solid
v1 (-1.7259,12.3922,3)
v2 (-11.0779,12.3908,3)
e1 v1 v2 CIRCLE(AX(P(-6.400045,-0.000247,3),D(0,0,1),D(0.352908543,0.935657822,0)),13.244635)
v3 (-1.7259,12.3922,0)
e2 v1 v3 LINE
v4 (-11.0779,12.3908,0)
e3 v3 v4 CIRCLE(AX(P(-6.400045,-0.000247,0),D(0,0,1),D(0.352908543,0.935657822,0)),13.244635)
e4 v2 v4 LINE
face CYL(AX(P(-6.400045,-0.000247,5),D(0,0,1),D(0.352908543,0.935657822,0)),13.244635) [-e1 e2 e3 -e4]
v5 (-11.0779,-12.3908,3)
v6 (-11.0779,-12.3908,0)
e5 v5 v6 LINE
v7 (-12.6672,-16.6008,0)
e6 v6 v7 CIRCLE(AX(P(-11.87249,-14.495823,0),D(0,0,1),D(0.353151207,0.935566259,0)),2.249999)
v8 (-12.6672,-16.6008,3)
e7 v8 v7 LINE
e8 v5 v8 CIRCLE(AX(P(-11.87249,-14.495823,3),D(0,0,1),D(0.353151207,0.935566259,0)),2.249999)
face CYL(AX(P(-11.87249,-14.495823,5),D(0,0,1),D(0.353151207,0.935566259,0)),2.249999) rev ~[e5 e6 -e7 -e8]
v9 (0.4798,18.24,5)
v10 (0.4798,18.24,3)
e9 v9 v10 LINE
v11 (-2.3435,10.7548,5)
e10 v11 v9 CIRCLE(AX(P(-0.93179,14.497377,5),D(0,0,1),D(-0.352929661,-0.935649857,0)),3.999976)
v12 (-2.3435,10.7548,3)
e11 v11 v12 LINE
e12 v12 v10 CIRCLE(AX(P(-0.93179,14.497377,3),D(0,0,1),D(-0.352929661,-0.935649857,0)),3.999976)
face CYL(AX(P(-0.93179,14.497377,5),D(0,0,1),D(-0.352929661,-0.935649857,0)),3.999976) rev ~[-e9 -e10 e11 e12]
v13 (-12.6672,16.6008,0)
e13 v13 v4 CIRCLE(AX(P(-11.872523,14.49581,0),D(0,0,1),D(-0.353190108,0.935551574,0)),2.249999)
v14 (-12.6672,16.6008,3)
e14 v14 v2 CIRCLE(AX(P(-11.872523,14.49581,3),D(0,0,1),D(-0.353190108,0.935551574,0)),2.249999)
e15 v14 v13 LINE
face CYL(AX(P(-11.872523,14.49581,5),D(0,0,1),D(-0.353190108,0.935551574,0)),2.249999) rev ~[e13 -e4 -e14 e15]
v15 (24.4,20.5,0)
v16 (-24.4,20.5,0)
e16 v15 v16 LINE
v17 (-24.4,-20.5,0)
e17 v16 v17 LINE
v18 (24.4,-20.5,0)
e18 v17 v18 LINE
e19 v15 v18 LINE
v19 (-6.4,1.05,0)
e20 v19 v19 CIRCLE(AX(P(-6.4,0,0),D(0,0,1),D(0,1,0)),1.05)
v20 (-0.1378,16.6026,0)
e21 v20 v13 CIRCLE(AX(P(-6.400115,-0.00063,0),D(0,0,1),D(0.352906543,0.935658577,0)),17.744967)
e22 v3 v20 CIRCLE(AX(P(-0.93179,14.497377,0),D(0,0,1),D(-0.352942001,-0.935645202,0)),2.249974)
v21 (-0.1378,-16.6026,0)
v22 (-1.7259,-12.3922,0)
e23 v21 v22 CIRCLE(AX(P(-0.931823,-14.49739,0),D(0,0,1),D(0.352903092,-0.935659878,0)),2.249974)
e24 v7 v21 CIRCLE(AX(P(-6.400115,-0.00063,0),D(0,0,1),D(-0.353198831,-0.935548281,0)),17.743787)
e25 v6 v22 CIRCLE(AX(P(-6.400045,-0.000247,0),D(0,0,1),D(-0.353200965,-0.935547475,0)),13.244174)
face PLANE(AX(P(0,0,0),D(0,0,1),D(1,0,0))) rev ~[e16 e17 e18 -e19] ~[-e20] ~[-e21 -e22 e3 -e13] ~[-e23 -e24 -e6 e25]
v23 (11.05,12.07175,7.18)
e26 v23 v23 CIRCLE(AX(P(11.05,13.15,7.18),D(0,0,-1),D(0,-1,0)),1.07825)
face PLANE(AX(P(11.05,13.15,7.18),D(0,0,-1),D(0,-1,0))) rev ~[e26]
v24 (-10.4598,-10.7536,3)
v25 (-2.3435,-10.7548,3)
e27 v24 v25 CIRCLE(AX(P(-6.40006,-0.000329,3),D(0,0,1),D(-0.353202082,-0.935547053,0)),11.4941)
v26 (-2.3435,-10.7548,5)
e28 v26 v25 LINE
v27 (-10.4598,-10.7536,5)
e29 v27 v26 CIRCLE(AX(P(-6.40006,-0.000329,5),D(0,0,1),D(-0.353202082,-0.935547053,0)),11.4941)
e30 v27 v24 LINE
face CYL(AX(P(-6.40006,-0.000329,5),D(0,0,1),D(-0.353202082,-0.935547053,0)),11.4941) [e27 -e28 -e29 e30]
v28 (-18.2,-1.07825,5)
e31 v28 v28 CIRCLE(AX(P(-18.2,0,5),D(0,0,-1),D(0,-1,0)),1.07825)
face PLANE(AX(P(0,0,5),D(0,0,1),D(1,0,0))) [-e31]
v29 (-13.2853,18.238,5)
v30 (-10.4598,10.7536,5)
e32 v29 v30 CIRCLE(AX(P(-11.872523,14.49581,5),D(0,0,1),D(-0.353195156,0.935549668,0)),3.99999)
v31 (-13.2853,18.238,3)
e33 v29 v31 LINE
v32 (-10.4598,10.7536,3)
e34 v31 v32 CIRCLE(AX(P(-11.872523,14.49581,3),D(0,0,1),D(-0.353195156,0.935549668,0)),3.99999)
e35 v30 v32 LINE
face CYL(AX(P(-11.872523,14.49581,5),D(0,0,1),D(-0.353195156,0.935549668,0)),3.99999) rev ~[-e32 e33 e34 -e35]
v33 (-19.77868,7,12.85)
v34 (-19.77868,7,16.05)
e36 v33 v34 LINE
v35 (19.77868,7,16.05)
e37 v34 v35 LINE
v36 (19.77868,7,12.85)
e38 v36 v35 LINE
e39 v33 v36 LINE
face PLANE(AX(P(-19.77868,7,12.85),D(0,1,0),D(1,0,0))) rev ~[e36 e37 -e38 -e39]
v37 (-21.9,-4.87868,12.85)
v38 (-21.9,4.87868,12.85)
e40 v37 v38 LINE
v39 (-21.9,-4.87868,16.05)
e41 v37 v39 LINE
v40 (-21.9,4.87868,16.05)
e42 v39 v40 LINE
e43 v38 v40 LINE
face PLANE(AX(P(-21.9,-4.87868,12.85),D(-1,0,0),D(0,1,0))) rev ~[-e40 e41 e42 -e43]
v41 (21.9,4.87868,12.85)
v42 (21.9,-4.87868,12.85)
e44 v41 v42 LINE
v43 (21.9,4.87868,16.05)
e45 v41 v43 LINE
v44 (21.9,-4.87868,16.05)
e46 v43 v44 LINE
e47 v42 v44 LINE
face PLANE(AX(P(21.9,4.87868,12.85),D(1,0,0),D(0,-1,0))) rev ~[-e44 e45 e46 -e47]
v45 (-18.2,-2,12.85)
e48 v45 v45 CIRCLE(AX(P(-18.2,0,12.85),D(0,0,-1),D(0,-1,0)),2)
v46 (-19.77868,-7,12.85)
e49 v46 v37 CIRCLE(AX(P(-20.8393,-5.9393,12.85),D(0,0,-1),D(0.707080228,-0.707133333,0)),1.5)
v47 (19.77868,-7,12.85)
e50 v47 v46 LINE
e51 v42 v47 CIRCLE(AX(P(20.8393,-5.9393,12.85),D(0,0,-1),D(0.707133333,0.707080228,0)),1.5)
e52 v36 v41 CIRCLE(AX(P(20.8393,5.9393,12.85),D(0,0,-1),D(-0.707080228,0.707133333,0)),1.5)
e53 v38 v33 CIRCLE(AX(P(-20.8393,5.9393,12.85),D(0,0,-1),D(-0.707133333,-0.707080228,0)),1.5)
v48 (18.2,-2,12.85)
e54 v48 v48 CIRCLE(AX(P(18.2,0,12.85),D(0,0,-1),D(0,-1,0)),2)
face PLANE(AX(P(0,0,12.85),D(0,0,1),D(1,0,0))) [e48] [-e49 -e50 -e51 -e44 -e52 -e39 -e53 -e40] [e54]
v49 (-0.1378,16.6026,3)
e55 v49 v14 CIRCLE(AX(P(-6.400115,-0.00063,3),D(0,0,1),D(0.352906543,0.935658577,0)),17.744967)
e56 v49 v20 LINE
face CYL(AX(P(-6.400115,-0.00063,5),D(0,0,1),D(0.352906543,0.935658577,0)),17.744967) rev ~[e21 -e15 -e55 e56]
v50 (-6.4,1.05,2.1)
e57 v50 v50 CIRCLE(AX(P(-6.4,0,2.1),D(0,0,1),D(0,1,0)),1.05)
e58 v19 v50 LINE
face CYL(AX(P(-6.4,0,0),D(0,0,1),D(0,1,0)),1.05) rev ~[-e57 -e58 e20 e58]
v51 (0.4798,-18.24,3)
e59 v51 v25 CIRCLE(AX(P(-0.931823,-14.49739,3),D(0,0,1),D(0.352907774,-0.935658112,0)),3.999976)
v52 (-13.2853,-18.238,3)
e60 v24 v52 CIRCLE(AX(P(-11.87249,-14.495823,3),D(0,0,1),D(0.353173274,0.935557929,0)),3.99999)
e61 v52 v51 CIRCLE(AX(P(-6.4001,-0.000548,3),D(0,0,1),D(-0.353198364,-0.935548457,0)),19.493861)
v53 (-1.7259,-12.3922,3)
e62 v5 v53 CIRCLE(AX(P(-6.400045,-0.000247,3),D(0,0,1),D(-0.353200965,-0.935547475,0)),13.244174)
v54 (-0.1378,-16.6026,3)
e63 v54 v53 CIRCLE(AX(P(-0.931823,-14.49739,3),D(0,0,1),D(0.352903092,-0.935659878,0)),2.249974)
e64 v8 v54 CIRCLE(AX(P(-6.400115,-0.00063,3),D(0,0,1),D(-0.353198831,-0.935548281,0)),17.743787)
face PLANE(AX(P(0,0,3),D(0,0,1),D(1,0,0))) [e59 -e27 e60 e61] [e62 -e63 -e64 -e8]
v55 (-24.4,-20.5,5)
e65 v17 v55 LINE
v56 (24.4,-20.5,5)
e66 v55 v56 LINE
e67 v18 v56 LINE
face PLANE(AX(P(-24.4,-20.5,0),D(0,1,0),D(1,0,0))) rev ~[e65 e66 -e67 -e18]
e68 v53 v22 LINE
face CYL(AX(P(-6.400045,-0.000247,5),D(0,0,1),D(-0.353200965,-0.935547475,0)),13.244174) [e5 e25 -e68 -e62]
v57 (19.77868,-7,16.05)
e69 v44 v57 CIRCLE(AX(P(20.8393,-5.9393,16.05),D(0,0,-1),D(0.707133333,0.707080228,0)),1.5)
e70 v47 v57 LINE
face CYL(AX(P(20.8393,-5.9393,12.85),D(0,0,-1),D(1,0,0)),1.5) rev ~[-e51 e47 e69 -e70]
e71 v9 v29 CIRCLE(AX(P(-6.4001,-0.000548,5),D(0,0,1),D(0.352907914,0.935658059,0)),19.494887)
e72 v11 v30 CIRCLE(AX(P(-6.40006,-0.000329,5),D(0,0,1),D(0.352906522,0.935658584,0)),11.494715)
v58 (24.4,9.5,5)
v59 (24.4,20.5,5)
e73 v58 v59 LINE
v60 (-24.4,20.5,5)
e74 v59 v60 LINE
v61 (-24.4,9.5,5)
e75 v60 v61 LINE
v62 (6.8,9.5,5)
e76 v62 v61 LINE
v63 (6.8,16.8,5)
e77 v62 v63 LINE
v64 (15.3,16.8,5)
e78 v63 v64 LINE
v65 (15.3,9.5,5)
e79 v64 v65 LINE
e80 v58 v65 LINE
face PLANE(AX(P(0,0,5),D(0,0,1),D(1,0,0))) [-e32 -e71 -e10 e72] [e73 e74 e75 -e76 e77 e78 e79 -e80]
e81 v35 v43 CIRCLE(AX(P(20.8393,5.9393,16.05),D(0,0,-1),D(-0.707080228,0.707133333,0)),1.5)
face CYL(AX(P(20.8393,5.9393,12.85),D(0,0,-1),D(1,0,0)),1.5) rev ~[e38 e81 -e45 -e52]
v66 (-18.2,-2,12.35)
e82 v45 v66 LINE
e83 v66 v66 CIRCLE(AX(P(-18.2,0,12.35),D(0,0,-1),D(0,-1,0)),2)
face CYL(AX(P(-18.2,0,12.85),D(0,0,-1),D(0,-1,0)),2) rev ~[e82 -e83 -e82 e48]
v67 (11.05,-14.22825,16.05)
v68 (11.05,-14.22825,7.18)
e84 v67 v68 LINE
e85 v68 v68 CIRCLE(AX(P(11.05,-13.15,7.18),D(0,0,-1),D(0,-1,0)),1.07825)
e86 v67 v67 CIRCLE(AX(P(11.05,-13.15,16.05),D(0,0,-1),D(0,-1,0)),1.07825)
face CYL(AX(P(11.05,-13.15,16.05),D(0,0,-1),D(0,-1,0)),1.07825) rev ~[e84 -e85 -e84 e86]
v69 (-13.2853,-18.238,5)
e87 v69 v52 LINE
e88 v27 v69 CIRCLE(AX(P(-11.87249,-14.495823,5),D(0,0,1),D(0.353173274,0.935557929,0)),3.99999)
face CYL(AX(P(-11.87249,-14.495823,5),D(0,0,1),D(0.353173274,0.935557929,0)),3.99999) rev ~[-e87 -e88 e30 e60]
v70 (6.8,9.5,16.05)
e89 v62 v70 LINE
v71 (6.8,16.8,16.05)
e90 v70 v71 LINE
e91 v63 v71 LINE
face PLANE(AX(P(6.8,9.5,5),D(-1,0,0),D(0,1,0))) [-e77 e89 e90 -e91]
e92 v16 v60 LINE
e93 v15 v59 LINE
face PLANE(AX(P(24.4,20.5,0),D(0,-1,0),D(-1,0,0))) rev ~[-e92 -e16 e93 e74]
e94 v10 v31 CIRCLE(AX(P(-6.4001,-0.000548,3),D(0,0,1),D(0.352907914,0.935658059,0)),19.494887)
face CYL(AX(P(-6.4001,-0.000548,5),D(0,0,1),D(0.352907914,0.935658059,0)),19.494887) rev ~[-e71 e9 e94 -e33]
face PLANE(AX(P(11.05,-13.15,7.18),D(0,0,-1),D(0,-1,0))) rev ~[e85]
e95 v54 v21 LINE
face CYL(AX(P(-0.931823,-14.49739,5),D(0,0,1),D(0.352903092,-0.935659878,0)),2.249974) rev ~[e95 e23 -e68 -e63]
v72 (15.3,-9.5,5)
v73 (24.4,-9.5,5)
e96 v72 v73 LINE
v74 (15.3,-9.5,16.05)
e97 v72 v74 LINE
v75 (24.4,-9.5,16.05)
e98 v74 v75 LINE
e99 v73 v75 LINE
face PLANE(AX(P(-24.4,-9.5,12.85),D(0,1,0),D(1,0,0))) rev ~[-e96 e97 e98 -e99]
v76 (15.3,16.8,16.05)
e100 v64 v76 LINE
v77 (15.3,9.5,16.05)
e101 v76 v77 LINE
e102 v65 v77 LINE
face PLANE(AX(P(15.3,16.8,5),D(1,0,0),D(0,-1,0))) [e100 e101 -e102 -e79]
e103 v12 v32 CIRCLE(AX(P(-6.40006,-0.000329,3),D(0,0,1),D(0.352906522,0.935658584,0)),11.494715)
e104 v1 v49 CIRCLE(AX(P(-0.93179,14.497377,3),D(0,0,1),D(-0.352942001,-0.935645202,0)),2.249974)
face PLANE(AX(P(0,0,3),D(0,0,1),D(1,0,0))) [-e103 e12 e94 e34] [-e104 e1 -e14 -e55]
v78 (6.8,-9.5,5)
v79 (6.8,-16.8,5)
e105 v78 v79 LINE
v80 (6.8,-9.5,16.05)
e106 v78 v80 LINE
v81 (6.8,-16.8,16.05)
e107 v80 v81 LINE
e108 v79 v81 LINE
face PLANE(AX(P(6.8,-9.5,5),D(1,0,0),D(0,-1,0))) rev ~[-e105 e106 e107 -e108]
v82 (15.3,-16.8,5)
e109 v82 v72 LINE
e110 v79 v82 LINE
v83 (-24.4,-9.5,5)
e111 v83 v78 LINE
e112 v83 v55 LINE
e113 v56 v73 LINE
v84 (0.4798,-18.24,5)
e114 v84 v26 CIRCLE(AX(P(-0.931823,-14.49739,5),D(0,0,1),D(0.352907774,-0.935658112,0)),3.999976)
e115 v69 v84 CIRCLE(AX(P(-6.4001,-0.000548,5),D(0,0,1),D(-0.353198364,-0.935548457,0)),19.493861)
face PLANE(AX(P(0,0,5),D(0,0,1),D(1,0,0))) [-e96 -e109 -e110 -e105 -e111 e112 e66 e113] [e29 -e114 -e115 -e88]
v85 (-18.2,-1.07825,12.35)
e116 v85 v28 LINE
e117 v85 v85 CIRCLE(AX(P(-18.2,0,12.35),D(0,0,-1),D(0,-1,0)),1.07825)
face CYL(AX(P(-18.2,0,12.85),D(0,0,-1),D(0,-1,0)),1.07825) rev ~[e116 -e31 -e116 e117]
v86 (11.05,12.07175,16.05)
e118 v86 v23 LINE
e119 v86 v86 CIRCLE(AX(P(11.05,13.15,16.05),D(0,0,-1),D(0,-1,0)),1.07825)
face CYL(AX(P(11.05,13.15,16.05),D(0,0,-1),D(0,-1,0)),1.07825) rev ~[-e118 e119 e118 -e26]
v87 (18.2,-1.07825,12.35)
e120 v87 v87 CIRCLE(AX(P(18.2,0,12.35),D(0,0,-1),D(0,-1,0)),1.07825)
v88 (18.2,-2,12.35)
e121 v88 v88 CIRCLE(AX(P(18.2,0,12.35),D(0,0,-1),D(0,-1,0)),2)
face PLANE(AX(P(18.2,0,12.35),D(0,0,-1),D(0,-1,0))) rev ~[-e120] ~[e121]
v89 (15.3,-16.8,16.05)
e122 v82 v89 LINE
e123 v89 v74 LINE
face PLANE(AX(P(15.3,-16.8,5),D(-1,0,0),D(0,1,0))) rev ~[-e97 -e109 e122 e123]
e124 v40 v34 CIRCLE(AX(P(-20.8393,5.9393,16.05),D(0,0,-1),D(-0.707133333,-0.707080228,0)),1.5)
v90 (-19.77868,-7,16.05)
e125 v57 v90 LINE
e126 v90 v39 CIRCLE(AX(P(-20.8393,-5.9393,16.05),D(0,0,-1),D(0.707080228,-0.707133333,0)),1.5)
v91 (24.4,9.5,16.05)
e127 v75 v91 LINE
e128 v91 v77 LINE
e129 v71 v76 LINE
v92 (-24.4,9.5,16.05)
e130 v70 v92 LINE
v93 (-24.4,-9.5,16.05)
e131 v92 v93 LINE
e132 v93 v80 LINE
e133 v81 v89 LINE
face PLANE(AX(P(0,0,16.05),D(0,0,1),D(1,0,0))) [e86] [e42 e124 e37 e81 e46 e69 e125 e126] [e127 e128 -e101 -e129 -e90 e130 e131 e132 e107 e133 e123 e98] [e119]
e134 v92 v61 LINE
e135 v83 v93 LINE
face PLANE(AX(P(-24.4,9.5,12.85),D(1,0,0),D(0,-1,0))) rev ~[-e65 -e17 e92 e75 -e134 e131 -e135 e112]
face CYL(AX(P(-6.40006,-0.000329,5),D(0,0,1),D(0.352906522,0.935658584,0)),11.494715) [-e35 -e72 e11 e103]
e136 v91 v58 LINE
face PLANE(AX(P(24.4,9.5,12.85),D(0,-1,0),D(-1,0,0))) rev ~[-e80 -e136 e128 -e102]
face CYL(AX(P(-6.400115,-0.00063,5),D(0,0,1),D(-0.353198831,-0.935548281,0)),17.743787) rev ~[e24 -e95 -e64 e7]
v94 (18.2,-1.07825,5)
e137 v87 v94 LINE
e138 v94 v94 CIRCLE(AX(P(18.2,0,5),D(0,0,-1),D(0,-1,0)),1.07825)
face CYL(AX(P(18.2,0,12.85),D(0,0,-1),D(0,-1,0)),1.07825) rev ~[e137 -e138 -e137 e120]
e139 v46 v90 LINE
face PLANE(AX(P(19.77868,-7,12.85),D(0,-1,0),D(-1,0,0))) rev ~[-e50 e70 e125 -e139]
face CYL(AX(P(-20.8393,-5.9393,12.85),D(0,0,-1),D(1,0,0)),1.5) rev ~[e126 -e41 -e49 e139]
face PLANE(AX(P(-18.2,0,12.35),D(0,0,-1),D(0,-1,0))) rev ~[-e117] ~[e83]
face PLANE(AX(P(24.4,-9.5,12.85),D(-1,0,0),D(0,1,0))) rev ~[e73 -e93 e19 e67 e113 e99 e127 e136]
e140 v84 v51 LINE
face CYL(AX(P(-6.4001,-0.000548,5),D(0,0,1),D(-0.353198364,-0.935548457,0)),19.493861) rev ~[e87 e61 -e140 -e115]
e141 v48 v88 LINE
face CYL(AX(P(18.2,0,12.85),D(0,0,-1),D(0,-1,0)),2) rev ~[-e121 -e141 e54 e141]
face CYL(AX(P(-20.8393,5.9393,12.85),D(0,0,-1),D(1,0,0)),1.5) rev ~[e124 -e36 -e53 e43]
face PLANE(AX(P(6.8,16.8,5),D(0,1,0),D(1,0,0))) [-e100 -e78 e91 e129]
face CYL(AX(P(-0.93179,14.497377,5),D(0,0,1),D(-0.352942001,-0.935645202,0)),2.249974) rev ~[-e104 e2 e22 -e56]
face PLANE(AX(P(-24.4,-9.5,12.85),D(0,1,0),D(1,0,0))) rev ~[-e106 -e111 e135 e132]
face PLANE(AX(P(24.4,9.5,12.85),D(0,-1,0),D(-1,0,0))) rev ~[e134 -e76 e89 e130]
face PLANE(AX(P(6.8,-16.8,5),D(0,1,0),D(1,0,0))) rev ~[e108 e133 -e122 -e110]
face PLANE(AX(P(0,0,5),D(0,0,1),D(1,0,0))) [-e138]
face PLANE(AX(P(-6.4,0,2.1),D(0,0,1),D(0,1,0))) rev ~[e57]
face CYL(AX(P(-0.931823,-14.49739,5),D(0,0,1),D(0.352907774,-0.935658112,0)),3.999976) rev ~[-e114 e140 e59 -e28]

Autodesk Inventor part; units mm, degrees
ref_plane "YZ Plane" through (0, 0, 0) normal (1, 0, 0) x (0, 1, 0)
ref_plane "XZ Plane" through (0, 0, 0) normal (0, 1, 0) x (-1, 0, 0)
ref_plane "XY Plane" through (0, 0, 0) normal (0, 0, 1) x (1, 0, 0)
sketch "Sketch1" plane through (0, 0, 0) normal (0, 0, 1) x (1, 0, 0)
  line L0 (-24.4, -9.5) -> (24.4, -9.5)
  line L1 (24.4, -9.5) -> (24.4, 9.5)
  line L2 (24.4, 9.5) -> (-24.4, 9.5)
  line L3 (-24.4, 9.5) -> (-24.4, -9.5)
  line L4 (-24.4, -9.5) -> (24.4, 9.5) construction
  line L5 (24.4, -9.5) -> (-24.4, 9.5) construction
  point P0 (0, 0)
  dimension "LENGTH" = 48.8
  dimension "WIDTH" = 19
extrude "Extrusion1" add sketch "Sketch1" along normal blind 12.85
sketch "Sketch2" plane through (0, 0, 12.85) normal (0, 0, 1) x (1, 0, 0)
  point P0 (0, 0)
  point P1 (-18.2, 0)
  point P2 (18.2, 0)
  dimension "d11" = 0
  dimension "d12" = 0
  dimension "d13" = 36.4
  dimension "d14" = 18.2
hole "Hole1" at (-18.2, 0, 12.85) at (18.2, 0, 12.85) direction (0, 0, -1) diameter 2.1565 depth 8.87 thread size "4-40 UNC" class "2B" standard "ANSI Unified Screw Threads"
sketch "Sketch3" plane through (0, 0, 12.85) normal (0, 0, 1) x (1, 0, 0)
  point P0 (0, 0)
  point P1 (0, 0)
  dimension "d22" = 0
  dimension "d23" = 0
hole "Hole2" [suppressed]
sketch "Sketch4" plane through (0, 0, 0) normal (0, 0, -1) x (-1, 0, 0)
  line L0 (5.5, 0) -> (4.5, 0) construction
  line L1 (5.5, 1.05) -> (4.5, 1.05)
  line L2 (4.5, -1.05) -> (5.5, -1.05)
  arc A0 (5.5, -1.05) -> (5.5, 1.05) centre (5.5, 0) ccw
  arc A1 (4.5, 1.05) -> (4.5, -1.05) centre (4.5, 0) ccw
  point P0 (0, 0)
  point P1 (-5, 0)
  point P2 (5, 0)
  dimension "d24" = 1
  dimension "d25" = 0
  dimension "d26" = 0
  dimension "d27" = 10
  dimension "d28" = 5
  dimension "d29" = 1.05
hole "Hole3" [suppressed]
extrude "Extrusion2" [suppressed]
sketch "Sketch5" plane through (0, 0, 0) normal (0, 0, 1) x (1, 0, 0)
  line L0 (-24.4, -20.5) -> (24.4, -20.5)
  line L1 (24.4, -20.5) -> (24.4, 20.5)
  line L2 (24.4, 20.5) -> (-24.4, 20.5)
  line L3 (-24.4, 20.5) -> (-24.4, -20.5)
  line L4 (-24.4, -20.5) -> (24.4, 20.5) construction
  line L5 (24.4, -20.5) -> (-24.4, 20.5) construction
  point P0 (0, 0)
  dimension "d39" = 48.8
  dimension "d40" = 41
extrude "Extrusion3" add sketch "Sketch5" along normal blind 5
sketch "Sketch7" plane through (0, 0, 12.85) normal (0, 0, 1) x (1, 0, 0)
  circle A0 centre (18.2, 0) radius 1.0782 projected
  circle A1 centre (-18.2, 0) radius 1.0782 projected
  point P0 (0, 0)
  dimension "d54" = 0
  dimension "d55" = 0
  dimension "d56" = 0
  dimension "d57" = 0
hole "Hole5" at (18.2, 0, 12.85) at (-18.2, 0, 12.85) direction (0, 0, -1) diameter 4 depth 0.5
sketch "Sketch8" plane through (0, 0, 0) normal (0, 0, -1) x (-1, 0, 0)
  line L0 (0, 5.5) -> (0, 4.5) construction
  line L1 (-1.05, 5.5) -> (-1.05, 4.5)
  line L2 (1.05, 4.5) -> (1.05, 5.5)
  arc A0 (1.05, 5.5) -> (-1.05, 5.5) centre (0, 5.5) ccw
  arc A1 (-1.05, 4.5) -> (1.05, 4.5) centre (0, 4.5) ccw
  point P0 (0, 0)
  point P1 (0, -5)
  point P2 (0, 5)
  dimension "d77" = 1
  dimension "d78" = 1.05
  dimension "d79" = 10
  dimension "d80" = 0
  dimension "d81" = 0
  dimension "d82" = 5
hole "Hole6" [suppressed]
extrude "Extrusion4" [suppressed]
sketch "Sketch10" plane through (0, 0, 12.85) normal (0, 0, 1) x (1, 0, 0)
  line L0 (-24.4, -9.5) -> (24.4, -9.5)
  line L1 (24.4, -9.5) -> (24.4, 9.5)
  line L2 (24.4, 9.5) -> (-24.4, 9.5)
  line L3 (-24.4, 9.5) -> (-24.4, -9.5)
  line L4 (-24.4, -9.5) -> (24.4, 9.5) construction
  line L5 (24.4, -9.5) -> (-24.4, 9.5) construction
  line L6 (21.9, -7) -> (-21.9, -7)
  line L7 (-21.9, -7) -> (-21.9, 7)
  line L8 (-21.9, 7) -> (21.9, 7)
  line L9 (21.9, 7) -> (21.9, -7)
  line L10 (21.9, -7) -> (-21.9, 7) construction
  line L11 (-21.9, -7) -> (21.9, 7) construction
  circle A0 centre (-20.8393, 5.9393) radius 1.5
  circle A1 centre (-20.8393, -5.9393) radius 1.5
  circle A2 centre (20.8393, 5.9393) radius 1.5
  circle A3 centre (20.8393, -5.9393) radius 1.5
  line L12 (20.8393, 5.9393) -> (21.9, 7)
  line L13 (21.9, -7) -> (20.8393, -5.9393)
  line L14 (-20.8393, 5.9393) -> (-21.9, 7)
  line L15 (-20.8393, -5.9393) -> (-21.9, -7)
  point P0 (0, 0)
  point P1 (21.9, -4.8787)
  point P2 (19.7787, -7)
  point P3 (-19.7787, -7)
  point P4 (-21.9, -4.8787)
  point P5 (-21.9, 4.8787)
  point P6 (-19.7787, 7)
  point P7 (19.7787, 7)
  point P8 (21.9, 4.8787)
  dimension "d106" = 3
  dimension "d110" = 3
  dimension "d111" = 3
  dimension "d112" = 3
  dimension "d97" = 48.8
  dimension "d98" = 19
  dimension "d99" = 43.8
  dimension "d100" = 14
  dimension "d107" = 45
  dimension "d108" = 45
  dimension "d109" = 45
extrude "Extrusion6" add sketch "Sketch10" along normal blind 3.2
chamfer "Chamfer5" [suppressed]
sketch "Sketch12" plane through (0, 0, 5) normal (0, 0, 1) x (1, 0, 0)
  arc A0 (7.9961, 15.4962) -> (-8.004, 14.5013) centre (9.4196, -136.543) ccw construction
  arc A1 (7.9587, 19.496) -> (-8.4624, 18.4749) centre (9.4196, -136.543) ccw
  arc A2 (8.0336, 11.4964) -> (-7.5457, 10.5276) centre (9.4196, -136.543) ccw
  arc A3 (8.0336, 11.4964) -> (7.9587, 19.496) centre (7.9961, 15.4962) ccw
  arc A4 (-8.4624, 18.4749) -> (-7.5457, 10.5276) centre (-8.004, 14.5013) ccw
  line L0 (24.4, 2.961) -> (24.4, -2.961)
  line L1 (24.4, 0) -> (-24.4, 0)
  line L2 (-24.4, 8.5) -> (-24.4, -8.5)
  arc A5 (7.9961, 15.4962) -> (-8.004, 14.5013) centre (9.4196, -136.543) ccw construction
  arc A6 (7.9751, 17.7461) -> (-8.2619, 16.7364) centre (9.4196, -136.543) ccw
  arc A7 (8.0172, 13.2463) -> (-7.7462, 12.2661) centre (9.4196, -136.543) ccw
  arc A8 (8.0172, 13.2463) -> (7.9751, 17.7461) centre (7.9961, 15.4962) ccw
  arc A9 (-8.2619, 16.7364) -> (-7.7462, 12.2661) centre (-8.004, 14.5013) ccw
  arc A10 (-8.004, -14.5013) -> (7.9961, -15.4962) centre (9.4196, 136.543) ccw construction
  arc A11 (-8.4624, -18.4749) -> (7.9587, -19.496) centre (9.4196, 136.543) ccw
  arc A12 (-7.5457, -10.5276) -> (8.0336, -11.4964) centre (9.4196, 136.543) ccw
  arc A13 (7.9587, -19.496) -> (8.0336, -11.4964) centre (7.9961, -15.4962) ccw
  arc A14 (-7.5457, -10.5276) -> (-8.4624, -18.4749) centre (-8.004, -14.5013) ccw
  arc A15 (-8.004, -14.5013) -> (7.9961, -15.4962) centre (9.4196, 136.543) ccw construction
  arc A16 (-8.2619, -16.7364) -> (7.9751, -17.7461) centre (9.4196, 136.543) ccw
  arc A17 (-7.7462, -12.2661) -> (8.0172, -13.2463) centre (9.4196, 136.543) ccw
  arc A18 (7.9751, -17.7461) -> (8.0172, -13.2463) centre (7.9961, -15.4962) ccw
  arc A19 (-7.7462, -12.2661) -> (-8.2619, -16.7364) centre (-8.004, -14.5013) ccw
  point P0 (0, 0)
  point P1 (-8.004, 12.753)
  point P2 (7.9961, 17.2527)
  point P3 (-6.4165, 14.3405)
  point P4 (9.5836, 18.8402)
  point P5 (-8.004, -12.753)
  point P6 (7.9961, -17.2527)
  point P7 (9.5836, -18.8402)
  point P8 (-6.4165, -14.3405)
  dimension "d118" = 8
  dimension "d122" = 4.5
extrude "Extrusion12" [suppressed]
extrude "Extrusion13" [suppressed]
sketch "Sketch14" plane through (0, 0, 0) normal (0, 0, -1) x (-1, 0, 0)
  point P0 (0, 0)
  point P1 (6.4, 0)
hole "Hole7" at (-6.4, 0, 0) direction (0, 0, 1) diameter 2.1 depth 2.1
sketch "Sketch15" plane through (0, 0, 0) normal (0, 0, -1) x (-1, 0, 0)
  circle A0 centre (6.4, 0) radius 1.05 projected
  circle A1 centre (6.4, 0) radius 19.5
  circle A2 centre (6.4, 0) radius 11.5
  circle A3 centre (6.4, 0) radius 17.75
  circle A4 centre (6.4, 0) radius 13.25
  line L0 (-24.4, 9.5) -> (24.4, 9.5) projected
  line L1 (24.4, 9.5) -> (-24.4, 9.5)
  line L2 (-24.4, -20.5) -> (-24.4, 20.5) projected
  line L3 (24.4, -9.5) -> (-24.4, -9.5) projected
  line L4 (24.4, -9.5) -> (-24.4, -9.5)
  arc A5 (9.3371, 17.5053) -> (5.1369, 17.705) centre (6.4, 0) ccw
  arc A6 (8.5925, 13.0673) -> (5.4572, 13.2164) centre (6.4, 0) ccw
  arc A7 (13.9857, 17.9641) -> (-1.4292, 17.8592) centre (6.4, 0) ccw
  arc A8 (10.8736, 10.5942) -> (1.7828, 10.5324) centre (6.4, 0) ccw
  arc A9 (11.8707, 14.5025) -> (0.9294, 14.5025) centre (6.4, 0) ccw construction
  arc A10 (13.2825, 18.2451) -> (-0.4824, 18.2451) centre (6.4, 0) ccw
  arc A11 (10.4589, 10.7599) -> (2.3412, 10.7599) centre (6.4, 0) ccw
  arc A12 (10.4589, 10.7599) -> (13.2825, 18.2451) centre (11.8707, 14.5025) ccw
  arc A13 (-0.4824, 18.2451) -> (2.3412, 10.7599) centre (0.9294, 14.5025) ccw
  arc A14 (11.8707, 14.5025) -> (0.9294, 14.5025) centre (6.4, 0) ccw construction
  arc A15 (12.6648, 16.6077) -> (0.1352, 16.6077) centre (6.4, 0) ccw
  arc A16 (11.0766, 12.3973) -> (1.7235, 12.3973) centre (6.4, 0) ccw
  arc A17 (11.0766, 12.3973) -> (12.6648, 16.6077) centre (11.8707, 14.5025) ccw
  arc A18 (0.1352, 16.6077) -> (1.7235, 12.3973) centre (0.9294, 14.5025) ccw
  line L5 (24.4, 9.5) -> (24.4, -9.5) projected
  line L6 (24.4, 0) -> (-24.4, 0)
  arc A19 (5.1369, -17.705) -> (9.3371, -17.5053) centre (6.4, 0) ccw
  arc A20 (5.4572, -13.2164) -> (8.5925, -13.0673) centre (6.4, 0) ccw
  arc A21 (-1.4292, -17.8592) -> (13.9857, -17.9641) centre (6.4, 0) ccw
  arc A22 (1.7828, -10.5324) -> (10.8736, -10.5942) centre (6.4, 0) ccw
  arc A23 (0.9294, -14.5025) -> (11.8707, -14.5025) centre (6.4, 0) ccw construction
  arc A24 (-0.4824, -18.2451) -> (13.2825, -18.2451) centre (6.4, 0) ccw
  arc A25 (2.3412, -10.7599) -> (10.4589, -10.7599) centre (6.4, 0) ccw
  arc A26 (13.2825, -18.2451) -> (10.4589, -10.7599) centre (11.8707, -14.5025) ccw
  arc A27 (2.3412, -10.7599) -> (-0.4824, -18.2451) centre (0.9294, -14.5025) ccw
  arc A28 (0.9294, -14.5025) -> (11.8707, -14.5025) centre (6.4, 0) ccw construction
  arc A29 (0.1352, -16.6077) -> (12.6648, -16.6077) centre (6.4, 0) ccw
  arc A30 (1.7235, -12.3973) -> (11.0766, -12.3973) centre (6.4, 0) ccw
  arc A31 (12.6648, -16.6077) -> (11.0766, -12.3973) centre (11.8707, -14.5025) ccw
  arc A32 (1.7235, -12.3973) -> (0.1352, -16.6077) centre (0.9294, -14.5025) ccw
  point P0 (0, 0)
  point P1 (-24.4, -19.5)
  point P2 (-24.4, 19.5)
  point P3 (24.4, 8.5)
  point P4 (24.4, -8.5)
  point P5 (6.4, 15.5)
  point P6 (6.4, -15.5)
  dimension "d140" = 39
  dimension "d141" = 23
  dimension "d142" = 35.5
  dimension "d143" = 26.5
  dimension "d147" = 8
  dimension "d148" = 4.5
sketch "Sketch17" plane through (0, 0, 5) normal (0, 0, 1) x (1, 0, 0)
  circle A0 centre (-6.4, 0) radius 1.05 projected
  arc A1 (-11.8725, -14.4958) -> (-0.9318, -14.4974) centre (-6.4, 0) ccw construction
  arc A2 (-12.6672, -16.6008) -> (-0.1378, -16.6026) centre (-6.4, 0) ccw
  arc A3 (-11.0779, -12.3908) -> (-1.7259, -12.3922) centre (-6.4, 0) ccw
  arc A4 (-11.0779, -12.3908) -> (-12.6672, -16.6008) centre (-11.8725, -14.4958) ccw
  arc A5 (-0.1378, -16.6026) -> (-1.7259, -12.3922) centre (-0.9318, -14.4974) ccw
  arc A6 (-11.8725, -14.4958) -> (-0.9318, -14.4974) centre (-6.4, 0) ccw construction
  arc A7 (-13.2853, -18.238) -> (0.4798, -18.24) centre (-6.4, 0) ccw
  arc A8 (-10.4598, -10.7536) -> (-2.3435, -10.7548) centre (-6.4, 0) ccw
  arc A9 (-10.4598, -10.7536) -> (-13.2853, -18.238) centre (-11.8725, -14.4958) ccw
  arc A10 (0.4798, -18.24) -> (-2.3435, -10.7548) centre (-0.9318, -14.4974) ccw
  line L0 (-24.1444, 0) -> (24.3913, 0)
  line L1 (24.3913, 0) -> (-24.1444, 0)
  arc A11 (-0.9318, 14.4974) -> (-11.8725, 14.4958) centre (-6.4, 0) ccw construction
  arc A12 (-0.1378, 16.6026) -> (-12.6672, 16.6008) centre (-6.4, 0) ccw
  arc A13 (-1.7259, 12.3922) -> (-11.0779, 12.3908) centre (-6.4, 0) ccw
  arc A14 (-12.6672, 16.6008) -> (-11.0779, 12.3908) centre (-11.8725, 14.4958) ccw
  arc A15 (-1.7259, 12.3922) -> (-0.1378, 16.6026) centre (-0.9318, 14.4974) ccw
  arc A16 (-0.9318, 14.4974) -> (-11.8725, 14.4958) centre (-6.4, 0) ccw construction
  arc A17 (0.4798, 18.24) -> (-13.2853, 18.238) centre (-6.4, 0) ccw
  arc A18 (-2.3435, 10.7548) -> (-10.4598, 10.7536) centre (-6.4, 0) ccw
  arc A19 (-13.2853, 18.238) -> (-10.4598, 10.7536) centre (-11.8725, 14.4958) ccw
  arc A20 (-2.3435, 10.7548) -> (0.4798, 18.24) centre (-0.9318, 14.4974) ccw
  point P0 (0, 0)
  point P1 (-0.9324, -14.4958)
  point P2 (-0.9324, 14.4958)
  dimension "d149" = 4.5
  dimension "d150" = 8
extrude "Extrusion14" cut sketch "Sketch17" against normal through all contours A4 A3 A5 A2 | A15 A13 A14 A12
extrude "Extrusion15" cut sketch "Sketch17" against normal blind 2 contours A9 A8 A10 A7 | A20 A18 A19 A17
sketch "Sketch19" plane through (0, 0, 5) normal (0, 0, 1) x (1, 0, 0)
  line L0 (24.4, -9.5) -> (15.3, -9.5) construction
  line L1 (-24.4, -9.5) -> (24.4, -9.5) construction
  line L2 (15.3, -9.5) -> (6.8, -9.5)
  line L3 (6.8, -9.5) -> (6.8, -16.8)
  line L4 (6.8, -16.8) -> (15.3, -16.8)
  line L5 (15.3, -16.8) -> (15.3, -9.5)
  point P0 (0, 0)
  dimension "d155" = 9.1
  dimension "d156" = 8.5
  dimension "d157" = 7.3
extrude "Extrusion16" add sketch "Sketch19" along normal blind 11.05
sketch "Sketch20" plane through (0, 0, 5) normal (0, 0, 1) x (1, 0, 0)
  line L0 (24.4, 9.5) -> (24.4, 20.5) construction
  line L1 (24.4, 9.5) -> (15.3, 9.5) construction
  line L2 (24.4, 9.5) -> (-24.4, 9.5) construction
  line L3 (15.3, 9.5) -> (6.8, 9.5)
  line L4 (6.8, 9.5) -> (6.8, 16.8)
  line L5 (6.8, 16.8) -> (15.3, 16.8)
  line L6 (15.3, 16.8) -> (15.3, 9.5)
  point P0 (0, 0)
  dimension "d160" = 9.1
  dimension "d161" = 8.5
  dimension "d162" = 7.3
extrude "Extrusion17" add sketch "Sketch20" along normal blind 11.05
sketch "Sketch21" plane through (0, 0, 16.05) normal (0, 0, 1) x (1, 0, 0)
  line L0 (15.3, 16.8) -> (6.8, 16.8) construction
  line L1 (6.8, 16.8) -> (11.05, 16.8) construction
  line L2 (11.05, 16.8) -> (11.05, 13.15) construction
  line L3 (11.05, 13.15) -> (6.8, 13.15) construction
  line L4 (6.8, 13.15) -> (6.8, 16.8) construction
  line L5 (6.8, -9.5) -> (6.8, -16.8) construction
  line L6 (6.8, -9.5) -> (11.05, -9.5) construction
  line L7 (11.05, -9.5) -> (11.05, -13.15) construction
  line L8 (11.05, -13.15) -> (6.8, -13.15) construction
  line L9 (6.8, -13.15) -> (6.8, -9.5) construction
  point P0 (0, 0)
  dimension "d165" = 3.65
hole "Hole8" at (11.05, 13.15, 16.05) at (11.05, -13.15, 16.05) direction (0, 0, -1) diameter 2.1565 depth 8.87 thread size "4-40 UNC" class "2B" standard "ANSI Unified Screw Threads"
equation "\"d2\" = BEAM_HEIGHT - APERTURE_HEIGHT"
equation "\"d14\" = 0.5 * d13"
equation "\"d39\" = LENGTH"
equation "\"d106\" = d110"
equation "\"d111\" = d110"
equation "\"d112\" = d110"
equation "\"d97\" = LENGTH"
equation "\"d98\" = WIDTH"
equation "\"BEAM_HEIGHT\" = 19.05"
equation "\"APERTURE_HEIGHT\" = 6.2"
properties part number "ADAPTER_AOM-brimrose"
